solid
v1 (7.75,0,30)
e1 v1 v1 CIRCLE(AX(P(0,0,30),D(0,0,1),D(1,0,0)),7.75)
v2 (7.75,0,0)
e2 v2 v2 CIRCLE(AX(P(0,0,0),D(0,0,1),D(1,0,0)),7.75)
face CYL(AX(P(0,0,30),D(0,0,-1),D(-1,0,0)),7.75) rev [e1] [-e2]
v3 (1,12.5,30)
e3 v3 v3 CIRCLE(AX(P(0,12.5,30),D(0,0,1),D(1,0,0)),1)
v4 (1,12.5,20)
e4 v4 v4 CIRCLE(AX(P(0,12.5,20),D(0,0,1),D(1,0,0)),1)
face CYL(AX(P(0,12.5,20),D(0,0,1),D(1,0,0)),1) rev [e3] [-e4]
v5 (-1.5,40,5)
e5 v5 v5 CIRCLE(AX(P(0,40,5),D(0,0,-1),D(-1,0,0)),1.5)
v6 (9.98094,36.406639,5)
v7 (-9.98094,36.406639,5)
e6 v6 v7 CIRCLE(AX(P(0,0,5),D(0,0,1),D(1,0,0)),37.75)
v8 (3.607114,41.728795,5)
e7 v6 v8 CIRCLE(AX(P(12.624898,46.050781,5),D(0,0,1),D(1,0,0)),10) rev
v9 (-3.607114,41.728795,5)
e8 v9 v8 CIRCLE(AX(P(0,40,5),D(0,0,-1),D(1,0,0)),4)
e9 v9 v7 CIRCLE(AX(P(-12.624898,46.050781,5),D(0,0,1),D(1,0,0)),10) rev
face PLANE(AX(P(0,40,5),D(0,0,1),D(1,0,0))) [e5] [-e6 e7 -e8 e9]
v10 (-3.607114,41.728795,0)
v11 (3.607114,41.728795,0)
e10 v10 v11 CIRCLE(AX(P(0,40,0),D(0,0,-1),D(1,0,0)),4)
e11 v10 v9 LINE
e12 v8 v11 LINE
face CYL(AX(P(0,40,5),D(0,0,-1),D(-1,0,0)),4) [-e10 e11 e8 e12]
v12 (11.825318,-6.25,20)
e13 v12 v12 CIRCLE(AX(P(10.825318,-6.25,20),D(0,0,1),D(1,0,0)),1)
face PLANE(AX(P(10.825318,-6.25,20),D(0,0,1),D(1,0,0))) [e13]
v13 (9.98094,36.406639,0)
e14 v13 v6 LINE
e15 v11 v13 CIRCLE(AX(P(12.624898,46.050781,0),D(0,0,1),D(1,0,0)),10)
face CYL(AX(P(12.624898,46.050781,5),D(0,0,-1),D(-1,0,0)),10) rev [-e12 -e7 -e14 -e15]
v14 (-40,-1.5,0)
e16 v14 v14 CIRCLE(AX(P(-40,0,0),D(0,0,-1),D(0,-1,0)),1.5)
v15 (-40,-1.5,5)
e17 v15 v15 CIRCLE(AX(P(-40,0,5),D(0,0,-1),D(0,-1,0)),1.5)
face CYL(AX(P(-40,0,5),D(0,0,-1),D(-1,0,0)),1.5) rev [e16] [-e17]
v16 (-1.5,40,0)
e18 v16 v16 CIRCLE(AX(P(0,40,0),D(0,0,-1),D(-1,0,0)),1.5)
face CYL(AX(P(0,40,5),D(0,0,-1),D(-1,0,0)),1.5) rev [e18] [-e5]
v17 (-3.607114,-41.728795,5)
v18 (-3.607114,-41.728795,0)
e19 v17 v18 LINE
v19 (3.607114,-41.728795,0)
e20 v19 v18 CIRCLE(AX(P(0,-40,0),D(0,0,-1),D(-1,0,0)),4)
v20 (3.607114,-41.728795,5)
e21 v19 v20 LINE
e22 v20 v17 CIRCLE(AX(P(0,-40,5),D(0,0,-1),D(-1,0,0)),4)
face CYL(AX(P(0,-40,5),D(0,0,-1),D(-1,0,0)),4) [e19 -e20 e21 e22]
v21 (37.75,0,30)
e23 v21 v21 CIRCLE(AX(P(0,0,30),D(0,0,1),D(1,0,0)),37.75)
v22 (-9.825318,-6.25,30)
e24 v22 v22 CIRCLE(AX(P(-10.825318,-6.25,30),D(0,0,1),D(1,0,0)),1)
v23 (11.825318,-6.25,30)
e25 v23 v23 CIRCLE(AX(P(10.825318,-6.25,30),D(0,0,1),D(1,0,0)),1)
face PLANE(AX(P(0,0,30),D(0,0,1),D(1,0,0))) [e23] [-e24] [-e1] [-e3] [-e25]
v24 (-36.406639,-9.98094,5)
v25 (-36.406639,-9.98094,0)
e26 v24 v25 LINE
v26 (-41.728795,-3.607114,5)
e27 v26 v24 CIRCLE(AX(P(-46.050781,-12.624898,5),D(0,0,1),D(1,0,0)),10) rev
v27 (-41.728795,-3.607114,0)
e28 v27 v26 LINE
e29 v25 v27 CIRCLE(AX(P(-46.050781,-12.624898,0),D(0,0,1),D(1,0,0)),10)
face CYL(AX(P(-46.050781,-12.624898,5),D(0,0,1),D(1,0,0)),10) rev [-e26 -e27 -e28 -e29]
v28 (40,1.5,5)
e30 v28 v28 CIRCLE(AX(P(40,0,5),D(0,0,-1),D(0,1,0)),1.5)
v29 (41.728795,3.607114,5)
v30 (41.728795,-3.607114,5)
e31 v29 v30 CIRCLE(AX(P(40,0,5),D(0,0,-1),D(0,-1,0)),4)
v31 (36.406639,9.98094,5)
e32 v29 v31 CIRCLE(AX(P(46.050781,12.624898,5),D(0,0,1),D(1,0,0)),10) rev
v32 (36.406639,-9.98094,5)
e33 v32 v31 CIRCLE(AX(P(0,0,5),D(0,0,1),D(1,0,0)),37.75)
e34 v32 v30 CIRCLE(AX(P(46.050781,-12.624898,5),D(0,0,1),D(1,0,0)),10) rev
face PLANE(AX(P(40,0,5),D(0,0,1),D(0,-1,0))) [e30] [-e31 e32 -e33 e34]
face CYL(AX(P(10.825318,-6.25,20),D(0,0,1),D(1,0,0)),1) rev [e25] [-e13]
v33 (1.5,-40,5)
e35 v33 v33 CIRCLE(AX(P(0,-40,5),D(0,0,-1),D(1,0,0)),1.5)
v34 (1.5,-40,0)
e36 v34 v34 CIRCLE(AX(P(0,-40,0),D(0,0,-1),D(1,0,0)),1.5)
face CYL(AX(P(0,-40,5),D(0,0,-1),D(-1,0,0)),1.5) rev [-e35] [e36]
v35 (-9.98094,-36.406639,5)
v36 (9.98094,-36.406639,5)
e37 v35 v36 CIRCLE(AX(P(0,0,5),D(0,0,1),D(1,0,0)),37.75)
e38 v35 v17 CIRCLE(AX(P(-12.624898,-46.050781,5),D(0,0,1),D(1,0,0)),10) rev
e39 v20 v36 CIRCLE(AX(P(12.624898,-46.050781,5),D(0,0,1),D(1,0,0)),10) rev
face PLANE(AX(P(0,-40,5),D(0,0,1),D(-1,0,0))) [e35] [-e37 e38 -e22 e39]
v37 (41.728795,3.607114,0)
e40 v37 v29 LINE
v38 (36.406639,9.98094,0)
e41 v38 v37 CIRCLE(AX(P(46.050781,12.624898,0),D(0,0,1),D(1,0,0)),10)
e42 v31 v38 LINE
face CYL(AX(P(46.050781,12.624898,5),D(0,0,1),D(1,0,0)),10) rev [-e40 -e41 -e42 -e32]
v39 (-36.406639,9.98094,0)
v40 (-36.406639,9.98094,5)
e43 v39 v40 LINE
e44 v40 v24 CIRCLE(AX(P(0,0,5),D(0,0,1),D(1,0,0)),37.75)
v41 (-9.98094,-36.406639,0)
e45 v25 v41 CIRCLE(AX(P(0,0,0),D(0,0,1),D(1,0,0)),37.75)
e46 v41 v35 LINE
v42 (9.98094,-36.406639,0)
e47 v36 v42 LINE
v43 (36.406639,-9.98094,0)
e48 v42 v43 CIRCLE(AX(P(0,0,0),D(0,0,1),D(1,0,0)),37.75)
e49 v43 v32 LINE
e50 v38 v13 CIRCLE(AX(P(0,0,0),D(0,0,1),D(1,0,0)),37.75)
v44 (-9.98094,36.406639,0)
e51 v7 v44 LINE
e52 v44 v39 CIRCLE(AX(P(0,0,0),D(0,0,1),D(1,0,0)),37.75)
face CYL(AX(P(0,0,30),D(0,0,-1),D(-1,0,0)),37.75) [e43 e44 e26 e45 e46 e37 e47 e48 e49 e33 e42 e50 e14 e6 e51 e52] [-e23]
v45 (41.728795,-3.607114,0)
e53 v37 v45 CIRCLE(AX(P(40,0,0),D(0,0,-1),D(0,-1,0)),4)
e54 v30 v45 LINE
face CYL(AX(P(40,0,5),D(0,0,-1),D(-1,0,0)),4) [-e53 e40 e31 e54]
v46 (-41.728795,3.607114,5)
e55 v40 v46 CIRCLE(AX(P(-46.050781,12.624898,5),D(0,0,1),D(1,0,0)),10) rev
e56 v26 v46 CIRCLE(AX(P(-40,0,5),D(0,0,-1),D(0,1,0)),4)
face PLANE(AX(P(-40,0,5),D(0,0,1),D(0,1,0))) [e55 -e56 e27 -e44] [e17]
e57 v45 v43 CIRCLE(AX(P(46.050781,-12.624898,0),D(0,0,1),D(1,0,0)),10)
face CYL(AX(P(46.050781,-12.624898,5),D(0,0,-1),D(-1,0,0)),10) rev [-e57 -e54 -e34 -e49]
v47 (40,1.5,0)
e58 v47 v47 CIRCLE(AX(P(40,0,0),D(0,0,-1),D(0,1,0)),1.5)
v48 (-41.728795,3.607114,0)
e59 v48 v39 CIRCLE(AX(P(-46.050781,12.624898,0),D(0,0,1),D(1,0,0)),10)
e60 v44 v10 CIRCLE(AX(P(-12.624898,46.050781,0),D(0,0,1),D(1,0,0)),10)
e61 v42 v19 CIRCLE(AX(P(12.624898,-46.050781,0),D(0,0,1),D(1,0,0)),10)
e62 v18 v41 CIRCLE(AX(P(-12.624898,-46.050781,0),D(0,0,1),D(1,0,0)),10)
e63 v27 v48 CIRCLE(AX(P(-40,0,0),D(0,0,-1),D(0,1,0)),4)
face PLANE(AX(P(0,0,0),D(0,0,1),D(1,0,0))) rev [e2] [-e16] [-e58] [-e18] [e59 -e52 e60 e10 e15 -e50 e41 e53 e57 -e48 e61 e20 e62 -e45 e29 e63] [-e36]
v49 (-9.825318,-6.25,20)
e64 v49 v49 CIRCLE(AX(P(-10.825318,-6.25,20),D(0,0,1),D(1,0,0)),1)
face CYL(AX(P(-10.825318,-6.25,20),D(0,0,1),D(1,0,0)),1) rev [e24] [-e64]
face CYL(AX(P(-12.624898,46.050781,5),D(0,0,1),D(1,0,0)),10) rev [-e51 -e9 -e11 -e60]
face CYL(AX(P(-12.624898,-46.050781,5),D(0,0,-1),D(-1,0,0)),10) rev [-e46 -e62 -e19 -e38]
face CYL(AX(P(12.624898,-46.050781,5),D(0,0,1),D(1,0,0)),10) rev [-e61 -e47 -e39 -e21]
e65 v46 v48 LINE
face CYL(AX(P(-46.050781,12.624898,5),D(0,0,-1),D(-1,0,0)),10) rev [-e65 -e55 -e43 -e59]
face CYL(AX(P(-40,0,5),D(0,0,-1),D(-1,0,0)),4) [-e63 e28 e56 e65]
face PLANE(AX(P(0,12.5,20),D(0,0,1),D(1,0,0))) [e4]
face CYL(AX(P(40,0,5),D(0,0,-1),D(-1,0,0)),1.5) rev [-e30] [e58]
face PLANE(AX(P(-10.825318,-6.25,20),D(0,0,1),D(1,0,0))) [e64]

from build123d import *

# Parameters (mm, degrees)
SKETCH2_R                = 37.75
SKETCH2_R_2              = 7.75
BOSS_EXTRUDE1_DEPTH      = 30
SKETCH3_R                = 1
CUT_EXTRUDE1_DEPTH       = 10
SKETCH4_R                = 1.5
BOSS_EXTRUDE2_DEPTH      = 5
FILLET1_R                = 10
CIRPATTERN1_COUNT        = 4
FILLET1_OF_CIRPATTERN1_R = 10


with BuildPart() as part:
    # Sketch2 → Boss-Extrude1 (new body)
    with BuildSketch(Plane.XY):
        Circle(SKETCH2_R)
        Circle(SKETCH2_R_2, mode=Mode.SUBTRACT)
    extrude(amount=BOSS_EXTRUDE1_DEPTH)

    # Sketch3 → Cut-Extrude1 (cut)
    with BuildSketch(Plane.XY.offset(30)):
        with Locations((0, 12.5)):
            Circle(SKETCH3_R)
        with Locations((10.825317547, -6.25)):
            Circle(SKETCH3_R)
        with Locations((-10.825317547, -6.25)):
            Circle(SKETCH3_R)
    extrude(amount=-CUT_EXTRUDE1_DEPTH, mode=Mode.SUBTRACT)

    # Sketch4 → Boss-Extrude2 (add)
    with BuildSketch(Plane(origin=(0, 0, 0), x_dir=(-1, 0, 0), z_dir=(0, 0, -1))):
        with BuildLine():
            Line((-4, 37.495028442), (0, 37.75))
            Line((0, 37.75), (4, 37.495028442))
            Line((4, 37.495028442), (4, 40))
            ThreePointArc((4, 40), (0, 44), (-4, 40))
            Line((-4, 40), (-4, 37.495028442))
        make_face()
        with Locations((0, 40)):
            Circle(SKETCH4_R, mode=Mode.SUBTRACT)
    boss_extrude2 = extrude(amount=-BOSS_EXTRUDE2_DEPTH)

    # Fillet1
    # the kernel refuses this fillet: 10 mm, written as the material it adds along each edge
    with BuildSketch(Plane(origin=(4, 37.537481269, 5), x_dir=(0.9825908408243521, -0.18578277511139904, 0), z_dir=(0, 0, -1))) as fillet1_piece_1:
        with BuildLine():
            CenterArc((6.893121156, -9.967448048), FILLET1_R, 94.624278966, 49.061773925)
            Line((-1.164720332, -4.045354621), (-1.970504481, -3.453145278))
            ThreePointArc((-1.970504481, -3.453145278), (-1.440084404, -2.233865576), (-0.982590841, 0.185782775))
            Line((-0.982590841, 0.185782775), (0.0806213, 0.996744805))
            ThreePointArc((0.0806213, 0.996744805), (3.043454077, 0.877116383), (6.006286855, 0.996744805))
            Line((6.006286855, 0.996744805), (6.086908155, 0))
        make_face()
    extrude(amount=5)
    with BuildSketch(Plane(origin=(-4, 37.537481269, 5), x_dir=(-0.9825908408243521, -0.185782775111399, 0), z_dir=(0, 0, -1))) as fillet1_piece_2:
        with BuildLine():
            CenterArc((6.893121156, 9.967448048), FILLET1_R, 216.31394711, 49.061773925)
            Line((-1.164720332, 4.045354621), (-1.970504481, 3.453145278))
            ThreePointArc((-1.970504481, 3.453145278), (-1.440084404, 2.233865576), (-0.982590841, -0.185782775))
            Line((-0.982590841, -0.185782775), (0.0806213, -0.996744805))
            ThreePointArc((0.0806213, -0.996744805), (3.043454077, -0.877116383), (6.006286855, -0.996744805))
            Line((6.006286855, -0.996744805), (6.086908155, 0))
        make_face()
    extrude(amount=5)

    # CirPattern1: Boss-Extrude2 ×4 about axis
    cirpattern1_axis = Axis((0, 0, 0), (0, 0, 1))
    for i in range(1, CIRPATTERN1_COUNT):
        add(boss_extrude2.rotate(cirpattern1_axis, i * 360 / CIRPATTERN1_COUNT))

    # Fillet1 of CirPattern1
    # the kernel refuses this fillet: 10 mm, written as the material it adds along each edge
    with BuildSketch(Plane(origin=(-37.537481269, 4, 5), x_dir=(0.18578277511140276, 0.9825908408243514, 0), z_dir=(0, 0, -1)), Plane(origin=(-4, -37.537481269, 5), x_dir=(-0.9825908408243512, 0.18578277511140392, 0), z_dir=(0, 0, -1)), Plane(origin=(37.537481269, -4, 5), x_dir=(-0.1857827751114012, -0.9825908408243518, 0), z_dir=(0, 0, -1))) as fillet1_of_cirpattern1_piece_1:
        with BuildLine():
            CenterArc((6.893121156, -9.967448048), FILLET1_OF_CIRPATTERN1_R, 94.624278966, 49.061773925)
            Line((-1.164720332, -4.045354621), (-1.970504481, -3.453145278))
            ThreePointArc((-1.970504481, -3.453145278), (-1.440084404, -2.233865576), (-0.982590841, 0.185782775))
            Line((-0.982590841, 0.185782775), (0.0806213, 0.996744805))
            ThreePointArc((0.0806213, 0.996744805), (3.043454077, 0.877116383), (6.006286855, 0.996744805))
            Line((6.006286855, 0.996744805), (6.086908155, 0))
        make_face()
    extrude(amount=5)
    with BuildSketch(Plane(origin=(-37.537481269, -4, 5), x_dir=(0.1857827751113977, -0.9825908408243523, 0), z_dir=(0, 0, -1)), Plane(origin=(4, -37.537481269, 5), x_dir=(0.9825908408243529, 0.18578277511139504, 0), z_dir=(0, 0, -1)), Plane(origin=(37.537481269, 4, 5), x_dir=(-0.18578277511139632, 0.9825908408243527, 0), z_dir=(0, 0, -1))) as fillet1_of_cirpattern1_piece_2:
        with BuildLine():
            CenterArc((6.893121156, 9.967448048), FILLET1_OF_CIRPATTERN1_R, 216.31394711, 49.061773925)
            Line((-1.164720332, 4.045354621), (-1.970504481, 3.453145278))
            ThreePointArc((-1.970504481, 3.453145278), (-1.440084404, 2.233865576), (-0.982590841, -0.185782775))
            Line((-0.982590841, -0.185782775), (0.0806213, -0.996744805))
            ThreePointArc((0.0806213, -0.996744805), (3.043454077, -0.877116383), (6.006286855, -0.996744805))
            Line((6.006286855, -0.996744805), (6.086908155, 0))
        make_face()
    extrude(amount=5)


solid = part.part
